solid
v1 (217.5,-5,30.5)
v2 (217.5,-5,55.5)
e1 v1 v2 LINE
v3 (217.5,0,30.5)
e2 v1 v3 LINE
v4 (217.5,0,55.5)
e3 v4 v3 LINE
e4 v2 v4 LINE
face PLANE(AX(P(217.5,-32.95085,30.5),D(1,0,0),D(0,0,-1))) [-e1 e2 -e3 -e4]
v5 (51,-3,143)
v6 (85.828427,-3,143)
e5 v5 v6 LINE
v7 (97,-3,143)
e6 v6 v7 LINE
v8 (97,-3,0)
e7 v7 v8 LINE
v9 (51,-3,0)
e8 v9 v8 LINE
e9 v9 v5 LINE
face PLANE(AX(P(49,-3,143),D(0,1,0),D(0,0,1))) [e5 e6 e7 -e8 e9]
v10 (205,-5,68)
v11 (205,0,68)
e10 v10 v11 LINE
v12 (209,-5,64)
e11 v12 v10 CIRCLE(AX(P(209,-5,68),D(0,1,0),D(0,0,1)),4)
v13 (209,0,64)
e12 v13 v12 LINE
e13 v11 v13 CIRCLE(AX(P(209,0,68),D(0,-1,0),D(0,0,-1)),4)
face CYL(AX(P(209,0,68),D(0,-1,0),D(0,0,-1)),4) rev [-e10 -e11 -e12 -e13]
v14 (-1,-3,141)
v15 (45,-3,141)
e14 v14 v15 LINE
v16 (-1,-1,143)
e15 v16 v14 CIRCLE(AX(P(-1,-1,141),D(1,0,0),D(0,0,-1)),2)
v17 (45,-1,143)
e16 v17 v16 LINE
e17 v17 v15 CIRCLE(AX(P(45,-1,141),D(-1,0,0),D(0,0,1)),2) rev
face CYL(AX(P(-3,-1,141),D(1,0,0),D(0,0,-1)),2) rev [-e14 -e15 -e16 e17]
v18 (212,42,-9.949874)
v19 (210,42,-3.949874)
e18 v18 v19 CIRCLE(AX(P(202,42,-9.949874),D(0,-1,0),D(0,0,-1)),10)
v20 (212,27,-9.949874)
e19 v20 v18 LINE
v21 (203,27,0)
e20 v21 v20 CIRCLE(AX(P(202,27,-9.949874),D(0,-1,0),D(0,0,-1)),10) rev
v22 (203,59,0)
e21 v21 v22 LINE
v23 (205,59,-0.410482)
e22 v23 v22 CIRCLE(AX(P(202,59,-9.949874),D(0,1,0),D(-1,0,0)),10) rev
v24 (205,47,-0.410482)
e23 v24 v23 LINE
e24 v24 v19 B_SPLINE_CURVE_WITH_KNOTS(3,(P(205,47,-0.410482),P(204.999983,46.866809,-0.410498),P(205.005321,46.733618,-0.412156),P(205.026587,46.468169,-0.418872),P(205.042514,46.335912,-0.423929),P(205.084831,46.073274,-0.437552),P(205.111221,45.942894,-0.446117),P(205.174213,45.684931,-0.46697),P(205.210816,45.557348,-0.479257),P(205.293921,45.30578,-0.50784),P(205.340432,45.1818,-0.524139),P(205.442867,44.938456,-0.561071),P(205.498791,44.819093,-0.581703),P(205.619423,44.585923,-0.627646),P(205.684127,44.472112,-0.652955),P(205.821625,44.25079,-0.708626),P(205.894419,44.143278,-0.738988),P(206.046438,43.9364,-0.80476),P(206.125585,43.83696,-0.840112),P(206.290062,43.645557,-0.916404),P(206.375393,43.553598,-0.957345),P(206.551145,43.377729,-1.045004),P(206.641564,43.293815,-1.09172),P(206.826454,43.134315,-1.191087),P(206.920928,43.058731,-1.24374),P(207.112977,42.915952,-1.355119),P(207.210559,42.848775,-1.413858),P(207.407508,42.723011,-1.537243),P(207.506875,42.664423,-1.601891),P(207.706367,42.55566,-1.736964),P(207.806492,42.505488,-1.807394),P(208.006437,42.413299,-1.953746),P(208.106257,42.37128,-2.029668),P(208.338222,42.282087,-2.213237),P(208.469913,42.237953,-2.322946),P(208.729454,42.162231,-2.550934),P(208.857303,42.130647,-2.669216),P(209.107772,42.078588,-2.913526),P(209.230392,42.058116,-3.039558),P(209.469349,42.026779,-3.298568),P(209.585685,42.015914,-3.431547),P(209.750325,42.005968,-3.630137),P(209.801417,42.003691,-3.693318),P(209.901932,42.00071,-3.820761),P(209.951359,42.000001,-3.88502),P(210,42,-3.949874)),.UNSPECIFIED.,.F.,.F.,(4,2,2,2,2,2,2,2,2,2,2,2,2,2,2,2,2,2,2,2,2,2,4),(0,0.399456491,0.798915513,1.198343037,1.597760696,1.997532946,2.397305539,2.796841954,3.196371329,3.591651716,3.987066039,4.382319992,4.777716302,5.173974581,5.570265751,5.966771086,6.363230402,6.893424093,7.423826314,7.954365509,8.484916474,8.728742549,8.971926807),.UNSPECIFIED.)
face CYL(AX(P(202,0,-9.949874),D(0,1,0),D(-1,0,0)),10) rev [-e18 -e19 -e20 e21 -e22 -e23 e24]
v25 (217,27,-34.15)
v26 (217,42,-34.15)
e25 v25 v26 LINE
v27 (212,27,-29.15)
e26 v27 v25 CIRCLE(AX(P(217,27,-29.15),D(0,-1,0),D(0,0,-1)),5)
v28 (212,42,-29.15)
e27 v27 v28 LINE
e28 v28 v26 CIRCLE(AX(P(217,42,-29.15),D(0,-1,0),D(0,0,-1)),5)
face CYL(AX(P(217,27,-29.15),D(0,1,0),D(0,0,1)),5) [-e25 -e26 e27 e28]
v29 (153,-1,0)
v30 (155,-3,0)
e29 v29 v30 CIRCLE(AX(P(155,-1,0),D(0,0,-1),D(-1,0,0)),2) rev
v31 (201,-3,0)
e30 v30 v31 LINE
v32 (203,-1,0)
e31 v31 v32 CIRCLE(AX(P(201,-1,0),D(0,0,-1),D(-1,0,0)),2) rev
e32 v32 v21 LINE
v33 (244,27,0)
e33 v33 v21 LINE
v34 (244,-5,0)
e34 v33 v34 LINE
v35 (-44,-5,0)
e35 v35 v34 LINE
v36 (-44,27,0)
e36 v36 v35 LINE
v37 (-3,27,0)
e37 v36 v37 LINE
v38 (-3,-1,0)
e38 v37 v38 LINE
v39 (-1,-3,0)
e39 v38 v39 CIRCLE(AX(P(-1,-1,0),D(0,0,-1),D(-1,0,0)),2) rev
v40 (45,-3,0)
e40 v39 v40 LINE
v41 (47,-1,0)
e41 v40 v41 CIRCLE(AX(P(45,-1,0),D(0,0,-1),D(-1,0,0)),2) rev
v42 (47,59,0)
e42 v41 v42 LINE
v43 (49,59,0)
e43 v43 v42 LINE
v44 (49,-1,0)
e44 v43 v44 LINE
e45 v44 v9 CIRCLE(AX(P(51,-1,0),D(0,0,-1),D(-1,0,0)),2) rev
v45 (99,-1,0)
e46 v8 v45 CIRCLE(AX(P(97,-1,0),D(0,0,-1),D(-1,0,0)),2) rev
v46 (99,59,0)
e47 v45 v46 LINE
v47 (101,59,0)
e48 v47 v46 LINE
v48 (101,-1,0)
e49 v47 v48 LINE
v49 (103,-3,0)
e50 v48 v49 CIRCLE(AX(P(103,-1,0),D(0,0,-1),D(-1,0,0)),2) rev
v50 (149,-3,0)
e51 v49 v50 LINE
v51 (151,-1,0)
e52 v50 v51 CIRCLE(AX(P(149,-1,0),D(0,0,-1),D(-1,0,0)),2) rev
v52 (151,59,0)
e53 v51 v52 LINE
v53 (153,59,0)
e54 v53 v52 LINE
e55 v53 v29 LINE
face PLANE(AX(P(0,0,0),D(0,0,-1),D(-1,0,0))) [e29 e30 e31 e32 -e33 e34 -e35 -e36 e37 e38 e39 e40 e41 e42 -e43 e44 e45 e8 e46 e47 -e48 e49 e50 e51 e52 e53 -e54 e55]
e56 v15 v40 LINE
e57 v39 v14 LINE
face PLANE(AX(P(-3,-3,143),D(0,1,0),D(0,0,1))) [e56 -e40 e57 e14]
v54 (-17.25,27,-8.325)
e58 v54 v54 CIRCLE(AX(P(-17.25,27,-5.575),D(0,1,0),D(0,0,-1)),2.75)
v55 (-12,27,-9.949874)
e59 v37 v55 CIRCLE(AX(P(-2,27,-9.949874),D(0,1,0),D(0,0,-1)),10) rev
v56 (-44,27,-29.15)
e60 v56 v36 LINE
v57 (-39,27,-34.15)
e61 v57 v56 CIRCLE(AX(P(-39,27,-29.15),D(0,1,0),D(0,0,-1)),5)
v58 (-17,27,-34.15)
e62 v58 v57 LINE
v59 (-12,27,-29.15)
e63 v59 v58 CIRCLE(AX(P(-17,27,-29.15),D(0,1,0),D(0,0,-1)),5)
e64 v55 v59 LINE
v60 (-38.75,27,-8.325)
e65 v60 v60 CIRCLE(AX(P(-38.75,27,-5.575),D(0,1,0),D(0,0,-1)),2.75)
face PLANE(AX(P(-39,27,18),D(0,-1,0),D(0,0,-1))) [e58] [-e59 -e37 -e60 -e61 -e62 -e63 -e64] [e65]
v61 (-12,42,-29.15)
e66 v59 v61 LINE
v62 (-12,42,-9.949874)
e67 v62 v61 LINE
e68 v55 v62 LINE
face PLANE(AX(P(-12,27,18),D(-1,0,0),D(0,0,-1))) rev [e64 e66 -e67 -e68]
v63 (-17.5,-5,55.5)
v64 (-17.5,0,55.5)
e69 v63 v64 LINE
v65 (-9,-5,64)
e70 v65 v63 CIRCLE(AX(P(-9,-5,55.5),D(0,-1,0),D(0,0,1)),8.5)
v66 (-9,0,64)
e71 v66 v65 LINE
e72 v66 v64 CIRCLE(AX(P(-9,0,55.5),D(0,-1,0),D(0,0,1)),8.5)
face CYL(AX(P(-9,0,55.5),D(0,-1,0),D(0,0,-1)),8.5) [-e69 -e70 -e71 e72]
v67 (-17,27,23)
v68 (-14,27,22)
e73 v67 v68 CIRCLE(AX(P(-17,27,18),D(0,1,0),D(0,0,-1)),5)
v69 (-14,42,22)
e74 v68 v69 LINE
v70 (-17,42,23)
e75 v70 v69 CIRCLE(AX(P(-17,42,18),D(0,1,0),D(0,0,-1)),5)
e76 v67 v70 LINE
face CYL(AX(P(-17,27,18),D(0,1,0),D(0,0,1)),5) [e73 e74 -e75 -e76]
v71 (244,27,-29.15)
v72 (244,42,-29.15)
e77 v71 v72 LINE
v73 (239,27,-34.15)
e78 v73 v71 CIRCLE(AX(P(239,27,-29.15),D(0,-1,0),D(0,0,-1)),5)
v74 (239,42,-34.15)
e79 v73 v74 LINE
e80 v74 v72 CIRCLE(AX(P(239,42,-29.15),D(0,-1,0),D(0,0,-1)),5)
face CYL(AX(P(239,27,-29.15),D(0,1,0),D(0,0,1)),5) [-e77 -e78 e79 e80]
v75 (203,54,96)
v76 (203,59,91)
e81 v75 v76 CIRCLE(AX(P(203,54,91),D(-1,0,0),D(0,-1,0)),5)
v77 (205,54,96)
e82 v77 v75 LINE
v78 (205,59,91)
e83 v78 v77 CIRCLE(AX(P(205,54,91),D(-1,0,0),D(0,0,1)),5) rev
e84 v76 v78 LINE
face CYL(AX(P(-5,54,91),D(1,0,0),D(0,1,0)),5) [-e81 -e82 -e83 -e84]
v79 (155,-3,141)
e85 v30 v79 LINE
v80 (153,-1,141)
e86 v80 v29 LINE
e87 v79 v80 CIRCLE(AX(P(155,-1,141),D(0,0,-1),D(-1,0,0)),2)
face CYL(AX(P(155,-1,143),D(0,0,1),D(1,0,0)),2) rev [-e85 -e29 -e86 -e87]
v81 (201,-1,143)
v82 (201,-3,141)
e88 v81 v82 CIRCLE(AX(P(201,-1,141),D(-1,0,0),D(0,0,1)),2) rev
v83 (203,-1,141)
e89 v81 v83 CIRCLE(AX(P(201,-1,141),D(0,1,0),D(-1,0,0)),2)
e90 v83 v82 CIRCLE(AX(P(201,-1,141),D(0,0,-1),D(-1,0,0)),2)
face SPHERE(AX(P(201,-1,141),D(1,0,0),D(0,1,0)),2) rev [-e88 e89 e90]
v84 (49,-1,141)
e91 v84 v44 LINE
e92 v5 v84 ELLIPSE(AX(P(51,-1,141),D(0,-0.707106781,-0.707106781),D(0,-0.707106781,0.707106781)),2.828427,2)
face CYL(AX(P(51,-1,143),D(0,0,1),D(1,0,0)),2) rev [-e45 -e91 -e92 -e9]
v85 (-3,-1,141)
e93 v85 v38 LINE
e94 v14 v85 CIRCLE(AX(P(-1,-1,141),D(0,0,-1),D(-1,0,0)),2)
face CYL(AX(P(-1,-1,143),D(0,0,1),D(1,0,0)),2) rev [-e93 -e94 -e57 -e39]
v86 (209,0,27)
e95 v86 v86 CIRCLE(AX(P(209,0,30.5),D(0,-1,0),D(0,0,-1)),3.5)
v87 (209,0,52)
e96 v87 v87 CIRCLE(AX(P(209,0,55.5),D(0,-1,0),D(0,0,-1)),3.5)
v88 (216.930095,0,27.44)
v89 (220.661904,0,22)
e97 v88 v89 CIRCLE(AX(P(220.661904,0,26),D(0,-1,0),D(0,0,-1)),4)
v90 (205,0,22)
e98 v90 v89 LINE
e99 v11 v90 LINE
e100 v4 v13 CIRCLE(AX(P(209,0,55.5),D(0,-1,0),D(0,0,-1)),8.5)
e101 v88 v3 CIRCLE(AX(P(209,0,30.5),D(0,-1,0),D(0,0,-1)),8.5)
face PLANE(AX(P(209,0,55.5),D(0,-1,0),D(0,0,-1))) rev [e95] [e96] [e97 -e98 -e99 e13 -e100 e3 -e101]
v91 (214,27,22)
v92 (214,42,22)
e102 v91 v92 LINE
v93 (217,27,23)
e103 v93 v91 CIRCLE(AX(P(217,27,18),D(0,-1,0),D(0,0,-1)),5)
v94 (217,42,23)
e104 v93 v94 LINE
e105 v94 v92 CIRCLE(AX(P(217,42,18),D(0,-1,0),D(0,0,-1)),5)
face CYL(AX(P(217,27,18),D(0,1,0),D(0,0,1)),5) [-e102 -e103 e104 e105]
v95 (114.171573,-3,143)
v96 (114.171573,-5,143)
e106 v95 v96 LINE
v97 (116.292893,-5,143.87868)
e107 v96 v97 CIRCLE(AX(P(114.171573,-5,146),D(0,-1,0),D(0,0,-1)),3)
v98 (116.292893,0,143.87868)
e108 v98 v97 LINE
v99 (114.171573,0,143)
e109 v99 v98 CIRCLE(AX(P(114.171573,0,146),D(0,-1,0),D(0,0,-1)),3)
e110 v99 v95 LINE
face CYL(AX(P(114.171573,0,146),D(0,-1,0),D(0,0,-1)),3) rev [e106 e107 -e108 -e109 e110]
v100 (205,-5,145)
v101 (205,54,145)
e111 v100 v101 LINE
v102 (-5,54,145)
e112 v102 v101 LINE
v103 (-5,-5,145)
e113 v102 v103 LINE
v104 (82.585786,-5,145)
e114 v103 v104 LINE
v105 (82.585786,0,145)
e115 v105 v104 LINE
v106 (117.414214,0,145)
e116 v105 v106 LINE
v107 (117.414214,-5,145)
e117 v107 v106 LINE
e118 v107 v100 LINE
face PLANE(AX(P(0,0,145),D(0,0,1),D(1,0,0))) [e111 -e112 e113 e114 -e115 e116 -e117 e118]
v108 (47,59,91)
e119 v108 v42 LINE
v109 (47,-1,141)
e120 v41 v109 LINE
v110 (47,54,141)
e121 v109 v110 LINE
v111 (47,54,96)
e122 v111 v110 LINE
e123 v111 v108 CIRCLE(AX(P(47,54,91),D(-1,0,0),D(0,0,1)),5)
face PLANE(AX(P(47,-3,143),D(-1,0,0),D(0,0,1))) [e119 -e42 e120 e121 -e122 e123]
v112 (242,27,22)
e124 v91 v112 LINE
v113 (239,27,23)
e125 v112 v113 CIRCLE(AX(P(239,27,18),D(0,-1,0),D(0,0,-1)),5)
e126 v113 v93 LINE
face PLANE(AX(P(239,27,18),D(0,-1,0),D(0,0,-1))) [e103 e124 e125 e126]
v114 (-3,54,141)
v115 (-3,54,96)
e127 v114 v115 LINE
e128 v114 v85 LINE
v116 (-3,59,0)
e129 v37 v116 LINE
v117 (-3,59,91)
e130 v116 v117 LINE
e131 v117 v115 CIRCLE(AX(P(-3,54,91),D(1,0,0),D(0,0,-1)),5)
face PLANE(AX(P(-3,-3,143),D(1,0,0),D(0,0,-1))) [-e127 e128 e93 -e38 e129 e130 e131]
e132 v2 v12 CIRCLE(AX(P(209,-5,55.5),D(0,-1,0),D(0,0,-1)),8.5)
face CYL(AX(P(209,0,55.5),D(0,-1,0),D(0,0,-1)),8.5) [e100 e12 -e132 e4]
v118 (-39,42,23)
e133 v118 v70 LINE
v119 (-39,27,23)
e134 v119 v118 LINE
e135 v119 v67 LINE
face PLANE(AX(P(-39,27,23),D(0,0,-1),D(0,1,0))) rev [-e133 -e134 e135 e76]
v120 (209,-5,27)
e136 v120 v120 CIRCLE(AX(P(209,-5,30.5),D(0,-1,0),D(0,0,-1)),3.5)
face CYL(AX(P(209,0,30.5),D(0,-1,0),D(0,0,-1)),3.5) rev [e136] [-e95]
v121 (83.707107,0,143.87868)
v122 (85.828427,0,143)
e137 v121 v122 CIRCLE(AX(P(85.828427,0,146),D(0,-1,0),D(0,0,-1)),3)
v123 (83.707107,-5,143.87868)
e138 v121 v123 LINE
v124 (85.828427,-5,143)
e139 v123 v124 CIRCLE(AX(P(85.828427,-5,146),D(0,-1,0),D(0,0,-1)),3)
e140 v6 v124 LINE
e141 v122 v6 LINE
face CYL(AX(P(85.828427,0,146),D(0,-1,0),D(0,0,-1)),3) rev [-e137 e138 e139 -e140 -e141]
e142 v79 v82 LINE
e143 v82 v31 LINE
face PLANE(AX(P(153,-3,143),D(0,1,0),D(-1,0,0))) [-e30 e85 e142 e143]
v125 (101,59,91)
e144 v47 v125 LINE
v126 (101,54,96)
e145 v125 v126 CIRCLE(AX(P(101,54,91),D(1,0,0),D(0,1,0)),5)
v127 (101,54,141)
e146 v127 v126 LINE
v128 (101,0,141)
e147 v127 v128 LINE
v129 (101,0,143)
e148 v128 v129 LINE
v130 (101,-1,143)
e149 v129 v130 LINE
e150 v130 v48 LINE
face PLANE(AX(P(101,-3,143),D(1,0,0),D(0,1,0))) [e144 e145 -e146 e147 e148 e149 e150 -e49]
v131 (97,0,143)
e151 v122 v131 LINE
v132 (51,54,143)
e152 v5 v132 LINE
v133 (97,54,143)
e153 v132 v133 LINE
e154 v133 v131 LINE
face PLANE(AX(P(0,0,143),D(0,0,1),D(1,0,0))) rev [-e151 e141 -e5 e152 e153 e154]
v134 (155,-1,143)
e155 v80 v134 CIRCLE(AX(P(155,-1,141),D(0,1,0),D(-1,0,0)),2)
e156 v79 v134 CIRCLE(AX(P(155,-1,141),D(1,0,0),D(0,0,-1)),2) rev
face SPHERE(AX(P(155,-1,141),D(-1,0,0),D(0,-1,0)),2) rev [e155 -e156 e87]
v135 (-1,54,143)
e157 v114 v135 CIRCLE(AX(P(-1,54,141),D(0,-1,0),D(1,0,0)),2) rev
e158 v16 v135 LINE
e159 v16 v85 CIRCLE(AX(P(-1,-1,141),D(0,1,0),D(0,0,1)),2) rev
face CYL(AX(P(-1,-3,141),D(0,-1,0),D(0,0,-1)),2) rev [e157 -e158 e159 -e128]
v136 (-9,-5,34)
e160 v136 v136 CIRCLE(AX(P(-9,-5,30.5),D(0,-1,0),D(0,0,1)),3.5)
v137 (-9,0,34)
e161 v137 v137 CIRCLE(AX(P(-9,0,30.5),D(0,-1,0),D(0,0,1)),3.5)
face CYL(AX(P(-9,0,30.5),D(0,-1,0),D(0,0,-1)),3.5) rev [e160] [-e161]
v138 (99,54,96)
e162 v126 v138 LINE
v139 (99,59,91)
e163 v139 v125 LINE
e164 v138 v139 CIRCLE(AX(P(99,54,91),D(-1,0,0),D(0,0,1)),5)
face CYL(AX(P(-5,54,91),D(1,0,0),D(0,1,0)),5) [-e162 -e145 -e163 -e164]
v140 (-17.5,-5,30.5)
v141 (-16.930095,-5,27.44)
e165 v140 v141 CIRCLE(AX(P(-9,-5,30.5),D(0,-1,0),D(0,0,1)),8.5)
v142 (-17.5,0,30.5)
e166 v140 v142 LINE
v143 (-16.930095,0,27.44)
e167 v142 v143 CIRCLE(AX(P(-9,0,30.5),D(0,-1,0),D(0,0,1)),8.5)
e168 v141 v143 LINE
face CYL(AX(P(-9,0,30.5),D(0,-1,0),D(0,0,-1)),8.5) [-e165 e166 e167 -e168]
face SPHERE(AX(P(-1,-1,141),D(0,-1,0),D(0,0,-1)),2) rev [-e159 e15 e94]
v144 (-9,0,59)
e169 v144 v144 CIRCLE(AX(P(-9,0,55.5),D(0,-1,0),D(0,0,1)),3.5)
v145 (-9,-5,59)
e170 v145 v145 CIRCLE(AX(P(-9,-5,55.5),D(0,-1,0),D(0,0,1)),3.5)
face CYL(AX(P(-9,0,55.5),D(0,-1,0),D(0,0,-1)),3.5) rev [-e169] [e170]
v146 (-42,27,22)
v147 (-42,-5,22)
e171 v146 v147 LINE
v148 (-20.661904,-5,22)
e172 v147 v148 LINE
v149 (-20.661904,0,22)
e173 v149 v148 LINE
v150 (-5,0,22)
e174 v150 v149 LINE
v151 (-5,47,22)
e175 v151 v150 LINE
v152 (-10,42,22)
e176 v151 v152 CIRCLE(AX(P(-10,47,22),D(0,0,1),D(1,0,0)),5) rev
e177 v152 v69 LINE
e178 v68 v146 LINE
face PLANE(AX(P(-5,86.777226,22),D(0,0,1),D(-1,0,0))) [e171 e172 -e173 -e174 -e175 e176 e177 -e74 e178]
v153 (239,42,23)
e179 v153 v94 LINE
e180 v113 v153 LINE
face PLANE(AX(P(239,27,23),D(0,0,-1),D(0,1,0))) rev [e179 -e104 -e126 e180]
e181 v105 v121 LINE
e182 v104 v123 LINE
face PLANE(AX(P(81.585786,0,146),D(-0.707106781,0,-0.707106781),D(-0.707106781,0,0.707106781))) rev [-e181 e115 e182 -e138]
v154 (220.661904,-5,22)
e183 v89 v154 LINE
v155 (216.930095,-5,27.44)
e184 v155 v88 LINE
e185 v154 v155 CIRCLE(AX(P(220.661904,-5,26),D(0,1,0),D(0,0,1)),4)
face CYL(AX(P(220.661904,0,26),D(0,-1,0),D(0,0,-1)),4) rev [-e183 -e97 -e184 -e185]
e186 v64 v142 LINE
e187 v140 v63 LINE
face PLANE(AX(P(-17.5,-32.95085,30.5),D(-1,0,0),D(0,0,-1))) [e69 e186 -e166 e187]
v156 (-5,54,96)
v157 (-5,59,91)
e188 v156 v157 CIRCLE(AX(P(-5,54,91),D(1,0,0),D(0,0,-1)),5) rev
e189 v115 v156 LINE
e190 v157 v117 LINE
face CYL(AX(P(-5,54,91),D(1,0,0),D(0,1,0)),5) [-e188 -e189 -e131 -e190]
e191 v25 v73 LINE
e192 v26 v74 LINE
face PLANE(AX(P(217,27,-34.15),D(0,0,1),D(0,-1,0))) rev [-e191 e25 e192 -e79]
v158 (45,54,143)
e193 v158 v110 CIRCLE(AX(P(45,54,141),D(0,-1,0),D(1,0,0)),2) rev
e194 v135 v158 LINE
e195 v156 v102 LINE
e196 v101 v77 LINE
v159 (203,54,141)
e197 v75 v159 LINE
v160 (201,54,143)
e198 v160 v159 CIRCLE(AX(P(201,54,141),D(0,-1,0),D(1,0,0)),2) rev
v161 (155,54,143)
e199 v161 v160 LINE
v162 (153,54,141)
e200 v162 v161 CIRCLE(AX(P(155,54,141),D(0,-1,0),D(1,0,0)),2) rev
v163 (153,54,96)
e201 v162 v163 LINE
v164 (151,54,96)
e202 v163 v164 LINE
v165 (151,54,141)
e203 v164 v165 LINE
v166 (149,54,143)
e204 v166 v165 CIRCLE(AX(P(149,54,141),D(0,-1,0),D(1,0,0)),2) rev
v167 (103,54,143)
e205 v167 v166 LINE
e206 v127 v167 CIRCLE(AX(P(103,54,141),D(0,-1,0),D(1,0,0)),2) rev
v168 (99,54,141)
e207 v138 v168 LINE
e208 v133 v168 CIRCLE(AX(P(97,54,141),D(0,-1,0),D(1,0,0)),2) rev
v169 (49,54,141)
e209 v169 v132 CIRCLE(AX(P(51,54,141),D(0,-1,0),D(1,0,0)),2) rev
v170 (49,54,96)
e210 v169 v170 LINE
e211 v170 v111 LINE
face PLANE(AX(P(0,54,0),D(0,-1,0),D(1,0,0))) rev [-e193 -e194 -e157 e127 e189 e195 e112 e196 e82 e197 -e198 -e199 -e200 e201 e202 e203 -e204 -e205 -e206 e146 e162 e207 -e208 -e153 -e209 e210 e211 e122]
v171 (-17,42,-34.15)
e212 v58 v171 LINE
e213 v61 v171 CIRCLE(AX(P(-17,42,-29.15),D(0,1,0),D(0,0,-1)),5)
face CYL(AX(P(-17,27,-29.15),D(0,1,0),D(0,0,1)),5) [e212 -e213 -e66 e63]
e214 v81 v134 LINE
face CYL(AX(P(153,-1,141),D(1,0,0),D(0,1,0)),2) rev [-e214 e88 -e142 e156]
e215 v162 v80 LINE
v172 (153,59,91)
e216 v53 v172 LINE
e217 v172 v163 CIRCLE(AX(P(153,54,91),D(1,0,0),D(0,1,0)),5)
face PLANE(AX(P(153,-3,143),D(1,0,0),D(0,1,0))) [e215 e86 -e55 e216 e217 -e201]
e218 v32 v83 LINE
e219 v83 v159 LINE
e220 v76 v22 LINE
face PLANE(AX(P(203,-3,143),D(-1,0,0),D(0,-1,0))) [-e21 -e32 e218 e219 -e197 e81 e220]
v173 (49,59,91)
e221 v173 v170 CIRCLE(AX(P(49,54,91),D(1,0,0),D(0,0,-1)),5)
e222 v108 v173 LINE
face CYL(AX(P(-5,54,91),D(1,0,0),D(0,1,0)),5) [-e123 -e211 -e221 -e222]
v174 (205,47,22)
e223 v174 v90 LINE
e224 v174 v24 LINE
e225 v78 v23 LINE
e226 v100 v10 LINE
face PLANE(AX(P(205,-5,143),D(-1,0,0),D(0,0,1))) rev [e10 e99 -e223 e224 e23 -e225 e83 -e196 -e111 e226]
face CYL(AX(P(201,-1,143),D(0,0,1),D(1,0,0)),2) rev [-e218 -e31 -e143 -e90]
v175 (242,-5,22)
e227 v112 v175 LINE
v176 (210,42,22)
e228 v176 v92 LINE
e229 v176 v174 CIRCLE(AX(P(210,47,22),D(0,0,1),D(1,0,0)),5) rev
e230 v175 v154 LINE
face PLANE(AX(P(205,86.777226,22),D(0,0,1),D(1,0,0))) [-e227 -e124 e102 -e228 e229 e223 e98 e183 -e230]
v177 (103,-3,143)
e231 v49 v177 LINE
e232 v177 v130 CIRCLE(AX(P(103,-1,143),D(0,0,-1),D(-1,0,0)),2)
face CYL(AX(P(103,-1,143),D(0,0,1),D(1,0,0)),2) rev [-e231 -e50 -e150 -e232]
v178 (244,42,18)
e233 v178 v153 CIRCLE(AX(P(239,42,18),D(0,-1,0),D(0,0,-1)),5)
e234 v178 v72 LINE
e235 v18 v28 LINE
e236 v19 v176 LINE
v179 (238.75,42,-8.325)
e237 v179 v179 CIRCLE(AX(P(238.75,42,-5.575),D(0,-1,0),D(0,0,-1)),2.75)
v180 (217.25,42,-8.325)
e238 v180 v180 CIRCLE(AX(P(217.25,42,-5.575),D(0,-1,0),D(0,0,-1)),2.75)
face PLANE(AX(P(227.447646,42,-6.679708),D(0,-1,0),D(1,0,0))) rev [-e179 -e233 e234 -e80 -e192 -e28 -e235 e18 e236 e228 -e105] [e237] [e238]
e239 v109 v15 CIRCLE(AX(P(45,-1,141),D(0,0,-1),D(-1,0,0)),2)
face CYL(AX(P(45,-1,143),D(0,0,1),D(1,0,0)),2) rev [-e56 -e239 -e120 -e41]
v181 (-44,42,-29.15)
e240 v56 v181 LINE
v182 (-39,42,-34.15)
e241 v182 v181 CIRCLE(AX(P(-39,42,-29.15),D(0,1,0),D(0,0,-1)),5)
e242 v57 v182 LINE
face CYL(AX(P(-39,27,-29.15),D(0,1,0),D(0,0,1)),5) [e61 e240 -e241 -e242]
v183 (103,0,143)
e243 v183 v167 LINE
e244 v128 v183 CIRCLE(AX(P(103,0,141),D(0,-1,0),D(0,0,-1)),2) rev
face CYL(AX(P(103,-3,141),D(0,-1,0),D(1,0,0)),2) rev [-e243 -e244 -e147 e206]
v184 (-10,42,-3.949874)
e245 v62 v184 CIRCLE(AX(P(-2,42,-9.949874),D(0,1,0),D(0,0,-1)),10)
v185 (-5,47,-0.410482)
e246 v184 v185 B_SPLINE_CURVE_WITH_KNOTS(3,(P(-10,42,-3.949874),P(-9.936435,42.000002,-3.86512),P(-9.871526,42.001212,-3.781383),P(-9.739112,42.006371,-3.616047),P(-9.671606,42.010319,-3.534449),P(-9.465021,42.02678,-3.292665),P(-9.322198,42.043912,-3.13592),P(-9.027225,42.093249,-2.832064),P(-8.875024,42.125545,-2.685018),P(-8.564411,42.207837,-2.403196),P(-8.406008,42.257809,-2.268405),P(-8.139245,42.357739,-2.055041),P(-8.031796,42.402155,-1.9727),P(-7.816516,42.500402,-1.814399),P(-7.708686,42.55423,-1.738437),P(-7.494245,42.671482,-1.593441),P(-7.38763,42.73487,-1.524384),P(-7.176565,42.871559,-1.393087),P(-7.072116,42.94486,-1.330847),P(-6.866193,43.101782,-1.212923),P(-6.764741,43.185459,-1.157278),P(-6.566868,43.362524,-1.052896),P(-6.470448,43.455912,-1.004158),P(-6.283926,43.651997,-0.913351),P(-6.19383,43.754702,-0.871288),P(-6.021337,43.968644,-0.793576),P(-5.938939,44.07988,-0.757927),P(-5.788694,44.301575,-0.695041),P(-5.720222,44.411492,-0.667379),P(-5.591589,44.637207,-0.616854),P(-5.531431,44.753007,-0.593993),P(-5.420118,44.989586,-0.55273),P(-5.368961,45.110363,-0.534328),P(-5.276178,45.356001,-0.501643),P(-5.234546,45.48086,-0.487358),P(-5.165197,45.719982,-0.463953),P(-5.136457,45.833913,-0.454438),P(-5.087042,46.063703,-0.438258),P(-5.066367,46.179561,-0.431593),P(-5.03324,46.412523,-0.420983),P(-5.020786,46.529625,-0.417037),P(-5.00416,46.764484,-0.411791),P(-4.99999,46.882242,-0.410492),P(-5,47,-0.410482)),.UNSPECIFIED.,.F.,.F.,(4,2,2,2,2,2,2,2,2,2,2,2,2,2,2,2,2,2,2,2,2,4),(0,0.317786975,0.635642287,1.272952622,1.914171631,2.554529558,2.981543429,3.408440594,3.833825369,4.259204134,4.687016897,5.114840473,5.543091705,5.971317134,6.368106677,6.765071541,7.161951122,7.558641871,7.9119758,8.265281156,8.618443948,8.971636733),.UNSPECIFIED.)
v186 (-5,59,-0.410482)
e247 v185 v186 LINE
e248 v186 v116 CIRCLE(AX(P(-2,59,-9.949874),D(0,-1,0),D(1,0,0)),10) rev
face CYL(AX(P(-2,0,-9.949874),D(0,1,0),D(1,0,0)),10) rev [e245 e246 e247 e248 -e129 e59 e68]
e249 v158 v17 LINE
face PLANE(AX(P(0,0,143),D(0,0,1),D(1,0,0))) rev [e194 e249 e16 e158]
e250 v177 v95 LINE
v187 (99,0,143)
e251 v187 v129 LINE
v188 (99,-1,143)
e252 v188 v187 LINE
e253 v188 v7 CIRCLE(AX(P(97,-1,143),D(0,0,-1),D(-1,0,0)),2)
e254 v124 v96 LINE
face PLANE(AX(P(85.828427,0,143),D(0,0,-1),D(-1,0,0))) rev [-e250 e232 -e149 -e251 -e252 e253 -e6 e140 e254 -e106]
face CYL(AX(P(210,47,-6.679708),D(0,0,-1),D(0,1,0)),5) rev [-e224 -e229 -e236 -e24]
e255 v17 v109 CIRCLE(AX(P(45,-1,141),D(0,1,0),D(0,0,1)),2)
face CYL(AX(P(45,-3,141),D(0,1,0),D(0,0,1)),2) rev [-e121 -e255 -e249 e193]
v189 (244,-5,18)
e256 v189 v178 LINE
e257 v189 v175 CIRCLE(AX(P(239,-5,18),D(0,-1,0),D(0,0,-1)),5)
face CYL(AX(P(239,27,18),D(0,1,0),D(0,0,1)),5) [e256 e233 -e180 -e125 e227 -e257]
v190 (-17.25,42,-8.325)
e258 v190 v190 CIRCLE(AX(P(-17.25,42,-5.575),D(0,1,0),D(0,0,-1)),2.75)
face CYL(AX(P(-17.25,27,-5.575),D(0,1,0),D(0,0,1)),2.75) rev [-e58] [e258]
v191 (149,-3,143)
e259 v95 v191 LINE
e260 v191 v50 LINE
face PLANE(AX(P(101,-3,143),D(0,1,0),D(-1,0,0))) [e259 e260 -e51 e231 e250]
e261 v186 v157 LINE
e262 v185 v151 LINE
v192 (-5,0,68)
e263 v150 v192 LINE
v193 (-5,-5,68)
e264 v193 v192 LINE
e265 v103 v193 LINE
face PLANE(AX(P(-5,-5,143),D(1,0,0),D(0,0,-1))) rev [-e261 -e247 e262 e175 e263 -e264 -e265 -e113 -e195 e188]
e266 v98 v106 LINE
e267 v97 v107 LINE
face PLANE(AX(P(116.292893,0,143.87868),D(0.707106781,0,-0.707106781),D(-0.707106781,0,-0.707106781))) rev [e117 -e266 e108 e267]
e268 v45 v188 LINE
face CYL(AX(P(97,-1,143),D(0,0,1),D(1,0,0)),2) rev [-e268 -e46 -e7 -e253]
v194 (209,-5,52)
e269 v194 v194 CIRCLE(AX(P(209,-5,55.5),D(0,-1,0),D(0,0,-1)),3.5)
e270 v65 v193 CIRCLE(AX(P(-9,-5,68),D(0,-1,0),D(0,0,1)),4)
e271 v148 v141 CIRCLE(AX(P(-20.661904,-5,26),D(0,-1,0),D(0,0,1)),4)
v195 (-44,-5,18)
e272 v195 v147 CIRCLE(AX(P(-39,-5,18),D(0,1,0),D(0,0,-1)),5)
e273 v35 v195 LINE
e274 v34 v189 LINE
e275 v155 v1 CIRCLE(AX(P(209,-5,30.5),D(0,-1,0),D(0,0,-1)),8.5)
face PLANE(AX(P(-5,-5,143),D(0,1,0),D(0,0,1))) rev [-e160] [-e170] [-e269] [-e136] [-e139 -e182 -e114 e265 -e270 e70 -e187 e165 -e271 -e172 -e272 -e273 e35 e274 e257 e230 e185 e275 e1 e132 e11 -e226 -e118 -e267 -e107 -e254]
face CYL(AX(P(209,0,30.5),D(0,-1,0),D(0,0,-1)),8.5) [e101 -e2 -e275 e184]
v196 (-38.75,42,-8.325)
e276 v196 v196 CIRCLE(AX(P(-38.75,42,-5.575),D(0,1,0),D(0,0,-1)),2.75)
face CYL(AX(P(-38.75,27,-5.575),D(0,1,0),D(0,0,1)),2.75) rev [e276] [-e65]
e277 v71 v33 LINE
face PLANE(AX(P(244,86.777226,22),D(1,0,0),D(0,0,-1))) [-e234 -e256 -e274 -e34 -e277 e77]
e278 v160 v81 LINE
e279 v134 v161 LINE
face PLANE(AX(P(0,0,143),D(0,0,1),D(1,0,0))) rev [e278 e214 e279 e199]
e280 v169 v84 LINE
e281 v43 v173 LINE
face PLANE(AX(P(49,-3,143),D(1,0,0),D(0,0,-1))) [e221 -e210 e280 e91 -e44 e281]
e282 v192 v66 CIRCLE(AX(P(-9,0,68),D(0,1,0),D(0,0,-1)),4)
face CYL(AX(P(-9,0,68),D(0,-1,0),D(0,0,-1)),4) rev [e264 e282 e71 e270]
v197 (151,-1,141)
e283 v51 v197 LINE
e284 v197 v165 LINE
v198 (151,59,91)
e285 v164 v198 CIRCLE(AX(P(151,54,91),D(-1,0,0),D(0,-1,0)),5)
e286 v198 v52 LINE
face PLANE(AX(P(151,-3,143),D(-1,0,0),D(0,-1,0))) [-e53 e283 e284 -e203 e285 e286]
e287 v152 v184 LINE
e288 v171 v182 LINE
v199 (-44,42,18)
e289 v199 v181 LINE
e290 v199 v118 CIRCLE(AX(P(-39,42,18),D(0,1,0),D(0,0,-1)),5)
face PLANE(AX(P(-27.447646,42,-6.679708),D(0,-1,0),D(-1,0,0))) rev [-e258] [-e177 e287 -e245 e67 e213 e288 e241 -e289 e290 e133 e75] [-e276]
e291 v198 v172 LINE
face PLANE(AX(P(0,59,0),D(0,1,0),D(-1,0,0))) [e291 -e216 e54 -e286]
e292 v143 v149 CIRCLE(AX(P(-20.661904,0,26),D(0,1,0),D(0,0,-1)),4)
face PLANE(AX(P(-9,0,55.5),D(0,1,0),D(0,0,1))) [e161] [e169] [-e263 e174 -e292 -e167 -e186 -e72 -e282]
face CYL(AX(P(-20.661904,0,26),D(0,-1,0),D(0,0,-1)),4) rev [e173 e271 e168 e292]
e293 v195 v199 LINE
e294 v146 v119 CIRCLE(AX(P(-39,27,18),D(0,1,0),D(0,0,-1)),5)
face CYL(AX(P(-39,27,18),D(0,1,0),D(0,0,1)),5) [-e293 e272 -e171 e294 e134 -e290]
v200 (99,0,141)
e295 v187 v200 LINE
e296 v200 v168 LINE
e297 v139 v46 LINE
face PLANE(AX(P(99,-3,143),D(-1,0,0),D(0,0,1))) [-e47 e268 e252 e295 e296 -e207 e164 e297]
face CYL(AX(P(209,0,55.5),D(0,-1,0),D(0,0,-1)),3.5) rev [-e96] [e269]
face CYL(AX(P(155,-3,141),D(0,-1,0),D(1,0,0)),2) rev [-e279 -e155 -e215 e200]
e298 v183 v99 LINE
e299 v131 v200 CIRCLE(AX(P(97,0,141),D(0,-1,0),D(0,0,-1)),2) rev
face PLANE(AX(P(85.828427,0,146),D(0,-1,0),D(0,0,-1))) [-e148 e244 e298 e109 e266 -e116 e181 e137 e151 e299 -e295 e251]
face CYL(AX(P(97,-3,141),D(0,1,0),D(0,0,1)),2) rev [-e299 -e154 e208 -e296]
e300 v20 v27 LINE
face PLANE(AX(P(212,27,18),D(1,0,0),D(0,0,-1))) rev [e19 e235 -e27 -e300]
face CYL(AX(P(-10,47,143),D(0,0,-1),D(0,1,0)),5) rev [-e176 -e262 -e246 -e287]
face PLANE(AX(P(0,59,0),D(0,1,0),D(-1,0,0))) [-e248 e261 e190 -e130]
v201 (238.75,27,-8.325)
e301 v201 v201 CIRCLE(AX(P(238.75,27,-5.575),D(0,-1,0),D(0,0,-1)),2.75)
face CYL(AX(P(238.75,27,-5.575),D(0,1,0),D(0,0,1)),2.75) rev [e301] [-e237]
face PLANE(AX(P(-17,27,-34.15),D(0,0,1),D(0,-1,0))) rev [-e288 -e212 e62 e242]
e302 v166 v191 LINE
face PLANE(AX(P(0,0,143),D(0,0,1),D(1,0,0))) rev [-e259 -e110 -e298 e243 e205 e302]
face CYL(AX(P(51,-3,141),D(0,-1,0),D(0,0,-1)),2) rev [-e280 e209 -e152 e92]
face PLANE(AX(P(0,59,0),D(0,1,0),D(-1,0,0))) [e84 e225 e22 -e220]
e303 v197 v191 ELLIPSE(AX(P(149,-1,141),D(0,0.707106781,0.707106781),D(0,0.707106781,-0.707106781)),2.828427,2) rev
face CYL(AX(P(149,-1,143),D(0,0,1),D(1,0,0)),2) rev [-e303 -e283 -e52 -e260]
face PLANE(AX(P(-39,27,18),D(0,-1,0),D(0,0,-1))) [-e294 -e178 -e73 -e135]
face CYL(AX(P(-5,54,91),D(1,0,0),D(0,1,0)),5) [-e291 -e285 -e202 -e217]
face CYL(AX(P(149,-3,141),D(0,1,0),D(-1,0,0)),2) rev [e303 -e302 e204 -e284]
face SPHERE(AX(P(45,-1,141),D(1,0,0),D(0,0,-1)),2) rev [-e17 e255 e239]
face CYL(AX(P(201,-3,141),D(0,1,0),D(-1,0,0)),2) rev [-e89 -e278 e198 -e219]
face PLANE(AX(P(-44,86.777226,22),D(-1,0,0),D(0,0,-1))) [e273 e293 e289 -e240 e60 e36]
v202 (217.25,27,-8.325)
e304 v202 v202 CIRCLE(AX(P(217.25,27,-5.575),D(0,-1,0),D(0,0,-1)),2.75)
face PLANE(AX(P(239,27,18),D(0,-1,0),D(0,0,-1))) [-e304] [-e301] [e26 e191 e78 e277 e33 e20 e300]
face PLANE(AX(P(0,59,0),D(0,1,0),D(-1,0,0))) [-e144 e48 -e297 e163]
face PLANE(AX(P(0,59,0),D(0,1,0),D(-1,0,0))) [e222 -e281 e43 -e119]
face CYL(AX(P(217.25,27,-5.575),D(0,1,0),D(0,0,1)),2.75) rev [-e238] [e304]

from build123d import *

# Parameters (mm, degrees)
SKETCH_2_W          = 210
SKETCH_2_H          = 67
SKETCH_2_W_2        = 50
SKETCH_2_H_2        = 63
EXTRUDE_1_DEPTH     = 143
SKETCH_3_W          = 210
SKETCH_3_H          = 67
EXTRUDE_2_DEPTH     = 2
CUT_EXTRUDE_1_DEPTH = 5
SKETCH_5_W          = 210
SKETCH_5_H          = 145
CUT_EXTRUDE_2_DEPTH = 3
SKETCH_6_R          = 3.5
EXTRUDE_3_DEPTH     = 5
SKETCH_7_W          = 39
SKETCH_7_H          = 22
EXTRUDE_4_DEPTH     = 47
SKETCH_8_R          = 2.75
EXTRUDE_5_DEPTH     = 15
CUT_EXTRUDE_3_DEPTH = 288.697758073
FILLET_1_R          = 10
FILLET_2_R          = 4
EXTRUDE_6_DEPTH     = 5
FILLET_3_R          = 5
FILLET_4_R          = 2
SKETCH_11_W         = 210
SKETCH_11_H         = 49
CUT_EXTRUDE_4_DEPTH = 5
FILLET_5_R          = 5


# Some blends are built 0.0001 mm under size
with BuildPart() as part:
    # Эскиз2 → Бобышка-Вытянуть1 (new body)
    with BuildSketch(Plane.XY):
        with Locations((100, 28.5)):
            Rectangle(SKETCH_2_W, SKETCH_2_H)
        with Locations((22, 28.5)):
            Rectangle(SKETCH_2_W_2, SKETCH_2_H_2, mode=Mode.SUBTRACT)
        with Locations((74, 28.5)):
            Rectangle(SKETCH_2_W_2, SKETCH_2_H_2, mode=Mode.SUBTRACT)
        with Locations((126, 28.5)):
            Rectangle(SKETCH_2_W_2, SKETCH_2_H_2, mode=Mode.SUBTRACT)
        with Locations((178, 28.5)):
            Rectangle(SKETCH_2_W_2, SKETCH_2_H_2, mode=Mode.SUBTRACT)
    extrude(amount=EXTRUDE_1_DEPTH)

    # Эскиз3 → Бобышка-Вытянуть2 (add)
    with BuildSketch(Plane.XY.offset(143)):
        with Locations((100, 28.5)):
            Rectangle(SKETCH_3_W, SKETCH_3_H)
    extrude(amount=EXTRUDE_2_DEPTH)

    # Эскиз4 → Вырез-Вытянуть1 (cut)
    with BuildSketch(Plane.XZ.offset(5)):
        with BuildLine():
            Line((85.828427125, 143), (114.171572875, 143))
            ThreePointArc((114.171572875, 143), (115.319623172, 143.228361402), (116.292893219, 143.878679656))
            Line((116.292893219, 143.878679656), (118.414213562, 146))
            Line((118.414213562, 146), (81.585786438, 146))
            Line((81.585786438, 146), (83.707106781, 143.878679656))
            ThreePointArc((83.707106781, 143.878679656), (84.680376828, 143.228361402), (85.828427125, 143))
        make_face()
    extrude(amount=-CUT_EXTRUDE_1_DEPTH, mode=Mode.SUBTRACT)

    # Эскиз5 → Вырез-Вытянуть2 (cut)
    with BuildSketch(Plane(origin=(0, 62, 0), x_dir=(1, 0, 0), z_dir=(0, 1, 0))):
        with Locations((100, -72.5)):
            Rectangle(SKETCH_5_W, SKETCH_5_H)
    extrude(amount=-CUT_EXTRUDE_2_DEPTH, mode=Mode.SUBTRACT)

    # Эскиз6 → Бобышка-Вытянуть3 (add)
    # profile 1 of 4: a face of its own
    with BuildSketch(Plane.XZ.offset(5)):
        with BuildLine():
            Line((205, 22), (205, 39))
            Line((205, 39), (209, 39))
            ThreePointArc((209, 39), (217.5, 30.5), (209, 22))
            Line((209, 22), (205, 22))
        make_face()
        with Locations(Location((209, 30.5, 0), (0, 0, 270))):
            Circle(SKETCH_6_R, mode=Mode.SUBTRACT)
    # profile 2 of 4: a face of its own
    with BuildSketch(Plane.XZ.offset(5)):
        with BuildLine():
            Line((209, 47), (205, 47))
            Line((205, 47), (205, 64))
            Line((205, 64), (209, 64))
            ThreePointArc((209, 64), (217.5, 55.5), (209, 47))
        make_face()
        with Locations(Location((209, 55.5, 0), (0, 0, 270))):
            Circle(SKETCH_6_R, mode=Mode.SUBTRACT)
    # profile 3 of 4: a face of its own
    with BuildSketch(Plane.XZ.offset(5)):
        with BuildLine():
            Line((-5, 47), (-5, 64))
            Line((-5, 64), (-9, 64))
            ThreePointArc((-9, 64), (-17.5, 55.5), (-9, 47))
            Line((-9, 47), (-5, 47))
        make_face()
        with Locations(Location((-9, 55.5, 0), (0, 0, 90))):
            Circle(SKETCH_6_R, mode=Mode.SUBTRACT)
    # profile 4 of 4: a face of its own
    with BuildSketch(Plane.XZ.offset(5)):
        with BuildLine():
            Line((-9, 39), (-5, 39))
            Line((-5, 39), (-5, 22))
            Line((-5, 22), (-9, 22))
            ThreePointArc((-9, 22), (-17.5, 30.5), (-9, 39))
        make_face()
        with Locations(Location((-9, 30.5, 0), (0, 0, 90))):
            Circle(SKETCH_6_R, mode=Mode.SUBTRACT)
    extrude(amount=-EXTRUDE_3_DEPTH)

    # Эскиз7 → Бобышка-Вытянуть4 (add)
    with BuildSketch(Plane.XZ.offset(5)):
        with Locations((224.5, 11)):
            Rectangle(SKETCH_7_W, SKETCH_7_H)
    extrude(amount=-EXTRUDE_4_DEPTH)

    # Эскиз8 → Бобышка-Вытянуть5 (add)
    with BuildSketch(Plane.XZ.offset(-42)):
        with BuildLine():
            Line((239, 23), (217, 23))
            ThreePointArc((217, 23), (213.464466094, 21.535533906), (212, 18))
            Line((212, 18), (212, -29.15))
            ThreePointArc((212, -29.15), (213.464466094, -32.685533906), (217, -34.15))
            Line((217, -34.15), (239, -34.15))
            ThreePointArc((239, -34.15), (242.535533906, -32.685533906), (244, -29.15))
            Line((244, -29.15), (244, 18))
            ThreePointArc((244, 18), (242.535533906, 21.535533906), (239, 23))
        make_face()
        with Locations(Location((238.75, -5.575, 0), (0, 0, 270))):
            Circle(SKETCH_8_R, mode=Mode.SUBTRACT)
        with Locations(Location((217.25, -5.575, 0), (0, 0, 270))):
            Circle(SKETCH_8_R, mode=Mode.SUBTRACT)
    extrude(amount=EXTRUDE_5_DEPTH)

    # Эскиз9 → Вырез-Вытянуть3 (cut, through all)
    with BuildSketch(Plane(origin=(0, 42, 0), x_dir=(1, 0, 0), z_dir=(0, 1, 0))):
        with BuildLine():
            Line((239, -23), (235.274216073, -23))
            Line((235.274216073, -23), (246.59675483, -31.709945179))
            Line((246.59675483, -31.709945179), (255.697113083, -21.551405734))
            Line((255.697113083, -21.551405734), (244, -13.403410553))
            Line((244, -13.403410553), (244, -18))
            ThreePointArc((244, -18), (242.535533906, -21.535533906), (239, -23))
        make_face()
    extrude(amount=-CUT_EXTRUDE_3_DEPTH, mode=Mode.SUBTRACT)

    # Скругление1
    # the kernel refuses this fillet: 10 mm, written as the material it adds along each edge
    with BuildSketch(Plane(origin=(212, 66.874685928, 0), x_dir=(0, 0, -1), z_dir=(0, -1, 0))) as fillet_1_piece_1_section:
        with BuildLine():
            CenterArc((9.949874371, -10), FILLET_1_R, 90, 84.260829523)
            Line((0, -9), (0, 0))
            Line((0, 0), (9.949874371, 0))
        make_face()
    fillet_1_piece_1 = extrude(amount=39.874685928, mode=Mode.PRIVATE)
    fillet_1_piece_1 = split(fillet_1_piece_1, bisect_by=Plane(origin=(205, 50.5, -0.134473646), z_dir=(-1, 0, 0)), keep=Keep.TOP, mode=Mode.PRIVATE)
    fillet_1_piece_1 = split(fillet_1_piece_1, bisect_by=Plane(origin=(204.014524412, 59, -0.134473646), z_dir=(0, -1, 0)), keep=Keep.TOP, mode=Mode.PRIVATE)
    add(fillet_1_piece_1)
    with BuildSketch(Plane(origin=(212, 42, 0), x_dir=(0, 0, -1), z_dir=(0, -1, 0))) as fillet_1_piece_2:
        with BuildLine():
            CenterArc((9.949874371, -10), FILLET_1_R, 90, 84.260829523)
            Line((0, -9), (0, 0))
            Line((0, 0), (9.949874371, 0))
        make_face()
    extrude(amount=15)

    # Скругление2
    fillet_2_edges = [part.edges().sort_by_distance(p)[0] for p in [
        (209, -2.5, 22),
        (205, -2.5, 64),
        (205, -2.5, 47),
        (205, -2.5, 39),
    ]]
    fillet(fillet_2_edges, radius=FILLET_2_R - 0.0001)  # a hair under: the kernel refuses the full size

    # Эскиз10 → Бобышка-Вытянуть6 (add)
    with BuildSketch(Plane(origin=(0, 0, 0), x_dir=(1, 0, 0), z_dir=(0, 1, 0))):
        Polygon((217.5, -30.5), (217.5, -55.5), (206.060928994, -47), (205, -45.939071006), (205, -34.579189919), (213.295374463, -34.579189919), align=None)
    extrude(amount=-EXTRUDE_6_DEPTH)

    # Зеркальное отражение1: part across plane


with BuildPart() as part_1:
    add(part.part)
    add(part.part.mirror(Plane(origin=(100, 0, 0), x_dir=(0, 0, 1), z_dir=(1, 0, 0))))

    # Скругление3
    fillet_3_edges = [part_1.edges().sort_by_distance(p)[0] for p in [
        (205, 42, 10.794758822),
        (-5, 42, 10.794758822),
    ]]
    fillet(fillet_3_edges, radius=FILLET_3_R)

    # Скругление4
    fillet_4_edges = [part_1.edges().sort_by_distance(p)[0] for p in [
        (203, -3, 71.5),
        (178, -3, 143),
        (153, -3, 71.5),
        (203, 28, 143),
        (153, 28, 143),
        (151, 28, 143),
        (151, -3, 71.5),
        (101, -3, 71.5),
        (101, 29.5, 143),
        (99, 29.5, 143),
        (49, 28, 143),
        (-3, 28, 143),
        (-3, -3, 71.5),
        (47, 28, 143),
        (22, -3, 143),
        (47, -3, 71.5),
        (49, -3, 71.5),
        (99, -3, 71.5),
    ]]
    fillet(fillet_4_edges, radius=FILLET_4_R)

    # Эскиз11 → Вырез-Вытянуть4 (cut)
    with BuildSketch(Plane(origin=(0, 59, 0), x_dir=(1, 0, 0), z_dir=(0, 1, 0))):
        with Locations((100, -120.5)):
            Rectangle(SKETCH_11_W, SKETCH_11_H)
    extrude(amount=-CUT_EXTRUDE_4_DEPTH, mode=Mode.SUBTRACT)

    # Скругление5
    # the kernel refuses this fillet: 5 mm, written as the material it takes off along each edge
    with BuildSketch(Plane(origin=(165.5, 59, 96), x_dir=(0, -1, 0), z_dir=(-1, 0, 0)), Plane(origin=(113.5, 59, 96), x_dir=(0, -1, 0), z_dir=(-1, 0, 0)), Plane(origin=(61.5, 59, 96), x_dir=(0, -1, 0), z_dir=(-1, 0, 0)), Plane(origin=(217.5, 59, 96), x_dir=(0, -1, 0), z_dir=(-1, 0, 0))) as fillet_5_piece_1:
        with BuildLine():
            CenterArc((FILLET_5_R, -FILLET_5_R), FILLET_5_R, 90, 90)
            Line((0, -FILLET_5_R), (0, 0))
            Line((0, 0), (FILLET_5_R, 0))
        make_face()
    extrude(amount=27, mode=Mode.SUBTRACT)
    with BuildSketch(Plane(origin=(9.5, 59, 96), x_dir=(0, 0, -1), z_dir=(-1, 0, 0))) as fillet_5_piece_2:
        with BuildLine():
            CenterArc((FILLET_5_R, FILLET_5_R), FILLET_5_R, 180, 90)
            Line((0, FILLET_5_R), (0, 0))
            Line((0, 0), (FILLET_5_R, 0))
        make_face()
    extrude(amount=27, mode=Mode.SUBTRACT)


solid = part_1.part
